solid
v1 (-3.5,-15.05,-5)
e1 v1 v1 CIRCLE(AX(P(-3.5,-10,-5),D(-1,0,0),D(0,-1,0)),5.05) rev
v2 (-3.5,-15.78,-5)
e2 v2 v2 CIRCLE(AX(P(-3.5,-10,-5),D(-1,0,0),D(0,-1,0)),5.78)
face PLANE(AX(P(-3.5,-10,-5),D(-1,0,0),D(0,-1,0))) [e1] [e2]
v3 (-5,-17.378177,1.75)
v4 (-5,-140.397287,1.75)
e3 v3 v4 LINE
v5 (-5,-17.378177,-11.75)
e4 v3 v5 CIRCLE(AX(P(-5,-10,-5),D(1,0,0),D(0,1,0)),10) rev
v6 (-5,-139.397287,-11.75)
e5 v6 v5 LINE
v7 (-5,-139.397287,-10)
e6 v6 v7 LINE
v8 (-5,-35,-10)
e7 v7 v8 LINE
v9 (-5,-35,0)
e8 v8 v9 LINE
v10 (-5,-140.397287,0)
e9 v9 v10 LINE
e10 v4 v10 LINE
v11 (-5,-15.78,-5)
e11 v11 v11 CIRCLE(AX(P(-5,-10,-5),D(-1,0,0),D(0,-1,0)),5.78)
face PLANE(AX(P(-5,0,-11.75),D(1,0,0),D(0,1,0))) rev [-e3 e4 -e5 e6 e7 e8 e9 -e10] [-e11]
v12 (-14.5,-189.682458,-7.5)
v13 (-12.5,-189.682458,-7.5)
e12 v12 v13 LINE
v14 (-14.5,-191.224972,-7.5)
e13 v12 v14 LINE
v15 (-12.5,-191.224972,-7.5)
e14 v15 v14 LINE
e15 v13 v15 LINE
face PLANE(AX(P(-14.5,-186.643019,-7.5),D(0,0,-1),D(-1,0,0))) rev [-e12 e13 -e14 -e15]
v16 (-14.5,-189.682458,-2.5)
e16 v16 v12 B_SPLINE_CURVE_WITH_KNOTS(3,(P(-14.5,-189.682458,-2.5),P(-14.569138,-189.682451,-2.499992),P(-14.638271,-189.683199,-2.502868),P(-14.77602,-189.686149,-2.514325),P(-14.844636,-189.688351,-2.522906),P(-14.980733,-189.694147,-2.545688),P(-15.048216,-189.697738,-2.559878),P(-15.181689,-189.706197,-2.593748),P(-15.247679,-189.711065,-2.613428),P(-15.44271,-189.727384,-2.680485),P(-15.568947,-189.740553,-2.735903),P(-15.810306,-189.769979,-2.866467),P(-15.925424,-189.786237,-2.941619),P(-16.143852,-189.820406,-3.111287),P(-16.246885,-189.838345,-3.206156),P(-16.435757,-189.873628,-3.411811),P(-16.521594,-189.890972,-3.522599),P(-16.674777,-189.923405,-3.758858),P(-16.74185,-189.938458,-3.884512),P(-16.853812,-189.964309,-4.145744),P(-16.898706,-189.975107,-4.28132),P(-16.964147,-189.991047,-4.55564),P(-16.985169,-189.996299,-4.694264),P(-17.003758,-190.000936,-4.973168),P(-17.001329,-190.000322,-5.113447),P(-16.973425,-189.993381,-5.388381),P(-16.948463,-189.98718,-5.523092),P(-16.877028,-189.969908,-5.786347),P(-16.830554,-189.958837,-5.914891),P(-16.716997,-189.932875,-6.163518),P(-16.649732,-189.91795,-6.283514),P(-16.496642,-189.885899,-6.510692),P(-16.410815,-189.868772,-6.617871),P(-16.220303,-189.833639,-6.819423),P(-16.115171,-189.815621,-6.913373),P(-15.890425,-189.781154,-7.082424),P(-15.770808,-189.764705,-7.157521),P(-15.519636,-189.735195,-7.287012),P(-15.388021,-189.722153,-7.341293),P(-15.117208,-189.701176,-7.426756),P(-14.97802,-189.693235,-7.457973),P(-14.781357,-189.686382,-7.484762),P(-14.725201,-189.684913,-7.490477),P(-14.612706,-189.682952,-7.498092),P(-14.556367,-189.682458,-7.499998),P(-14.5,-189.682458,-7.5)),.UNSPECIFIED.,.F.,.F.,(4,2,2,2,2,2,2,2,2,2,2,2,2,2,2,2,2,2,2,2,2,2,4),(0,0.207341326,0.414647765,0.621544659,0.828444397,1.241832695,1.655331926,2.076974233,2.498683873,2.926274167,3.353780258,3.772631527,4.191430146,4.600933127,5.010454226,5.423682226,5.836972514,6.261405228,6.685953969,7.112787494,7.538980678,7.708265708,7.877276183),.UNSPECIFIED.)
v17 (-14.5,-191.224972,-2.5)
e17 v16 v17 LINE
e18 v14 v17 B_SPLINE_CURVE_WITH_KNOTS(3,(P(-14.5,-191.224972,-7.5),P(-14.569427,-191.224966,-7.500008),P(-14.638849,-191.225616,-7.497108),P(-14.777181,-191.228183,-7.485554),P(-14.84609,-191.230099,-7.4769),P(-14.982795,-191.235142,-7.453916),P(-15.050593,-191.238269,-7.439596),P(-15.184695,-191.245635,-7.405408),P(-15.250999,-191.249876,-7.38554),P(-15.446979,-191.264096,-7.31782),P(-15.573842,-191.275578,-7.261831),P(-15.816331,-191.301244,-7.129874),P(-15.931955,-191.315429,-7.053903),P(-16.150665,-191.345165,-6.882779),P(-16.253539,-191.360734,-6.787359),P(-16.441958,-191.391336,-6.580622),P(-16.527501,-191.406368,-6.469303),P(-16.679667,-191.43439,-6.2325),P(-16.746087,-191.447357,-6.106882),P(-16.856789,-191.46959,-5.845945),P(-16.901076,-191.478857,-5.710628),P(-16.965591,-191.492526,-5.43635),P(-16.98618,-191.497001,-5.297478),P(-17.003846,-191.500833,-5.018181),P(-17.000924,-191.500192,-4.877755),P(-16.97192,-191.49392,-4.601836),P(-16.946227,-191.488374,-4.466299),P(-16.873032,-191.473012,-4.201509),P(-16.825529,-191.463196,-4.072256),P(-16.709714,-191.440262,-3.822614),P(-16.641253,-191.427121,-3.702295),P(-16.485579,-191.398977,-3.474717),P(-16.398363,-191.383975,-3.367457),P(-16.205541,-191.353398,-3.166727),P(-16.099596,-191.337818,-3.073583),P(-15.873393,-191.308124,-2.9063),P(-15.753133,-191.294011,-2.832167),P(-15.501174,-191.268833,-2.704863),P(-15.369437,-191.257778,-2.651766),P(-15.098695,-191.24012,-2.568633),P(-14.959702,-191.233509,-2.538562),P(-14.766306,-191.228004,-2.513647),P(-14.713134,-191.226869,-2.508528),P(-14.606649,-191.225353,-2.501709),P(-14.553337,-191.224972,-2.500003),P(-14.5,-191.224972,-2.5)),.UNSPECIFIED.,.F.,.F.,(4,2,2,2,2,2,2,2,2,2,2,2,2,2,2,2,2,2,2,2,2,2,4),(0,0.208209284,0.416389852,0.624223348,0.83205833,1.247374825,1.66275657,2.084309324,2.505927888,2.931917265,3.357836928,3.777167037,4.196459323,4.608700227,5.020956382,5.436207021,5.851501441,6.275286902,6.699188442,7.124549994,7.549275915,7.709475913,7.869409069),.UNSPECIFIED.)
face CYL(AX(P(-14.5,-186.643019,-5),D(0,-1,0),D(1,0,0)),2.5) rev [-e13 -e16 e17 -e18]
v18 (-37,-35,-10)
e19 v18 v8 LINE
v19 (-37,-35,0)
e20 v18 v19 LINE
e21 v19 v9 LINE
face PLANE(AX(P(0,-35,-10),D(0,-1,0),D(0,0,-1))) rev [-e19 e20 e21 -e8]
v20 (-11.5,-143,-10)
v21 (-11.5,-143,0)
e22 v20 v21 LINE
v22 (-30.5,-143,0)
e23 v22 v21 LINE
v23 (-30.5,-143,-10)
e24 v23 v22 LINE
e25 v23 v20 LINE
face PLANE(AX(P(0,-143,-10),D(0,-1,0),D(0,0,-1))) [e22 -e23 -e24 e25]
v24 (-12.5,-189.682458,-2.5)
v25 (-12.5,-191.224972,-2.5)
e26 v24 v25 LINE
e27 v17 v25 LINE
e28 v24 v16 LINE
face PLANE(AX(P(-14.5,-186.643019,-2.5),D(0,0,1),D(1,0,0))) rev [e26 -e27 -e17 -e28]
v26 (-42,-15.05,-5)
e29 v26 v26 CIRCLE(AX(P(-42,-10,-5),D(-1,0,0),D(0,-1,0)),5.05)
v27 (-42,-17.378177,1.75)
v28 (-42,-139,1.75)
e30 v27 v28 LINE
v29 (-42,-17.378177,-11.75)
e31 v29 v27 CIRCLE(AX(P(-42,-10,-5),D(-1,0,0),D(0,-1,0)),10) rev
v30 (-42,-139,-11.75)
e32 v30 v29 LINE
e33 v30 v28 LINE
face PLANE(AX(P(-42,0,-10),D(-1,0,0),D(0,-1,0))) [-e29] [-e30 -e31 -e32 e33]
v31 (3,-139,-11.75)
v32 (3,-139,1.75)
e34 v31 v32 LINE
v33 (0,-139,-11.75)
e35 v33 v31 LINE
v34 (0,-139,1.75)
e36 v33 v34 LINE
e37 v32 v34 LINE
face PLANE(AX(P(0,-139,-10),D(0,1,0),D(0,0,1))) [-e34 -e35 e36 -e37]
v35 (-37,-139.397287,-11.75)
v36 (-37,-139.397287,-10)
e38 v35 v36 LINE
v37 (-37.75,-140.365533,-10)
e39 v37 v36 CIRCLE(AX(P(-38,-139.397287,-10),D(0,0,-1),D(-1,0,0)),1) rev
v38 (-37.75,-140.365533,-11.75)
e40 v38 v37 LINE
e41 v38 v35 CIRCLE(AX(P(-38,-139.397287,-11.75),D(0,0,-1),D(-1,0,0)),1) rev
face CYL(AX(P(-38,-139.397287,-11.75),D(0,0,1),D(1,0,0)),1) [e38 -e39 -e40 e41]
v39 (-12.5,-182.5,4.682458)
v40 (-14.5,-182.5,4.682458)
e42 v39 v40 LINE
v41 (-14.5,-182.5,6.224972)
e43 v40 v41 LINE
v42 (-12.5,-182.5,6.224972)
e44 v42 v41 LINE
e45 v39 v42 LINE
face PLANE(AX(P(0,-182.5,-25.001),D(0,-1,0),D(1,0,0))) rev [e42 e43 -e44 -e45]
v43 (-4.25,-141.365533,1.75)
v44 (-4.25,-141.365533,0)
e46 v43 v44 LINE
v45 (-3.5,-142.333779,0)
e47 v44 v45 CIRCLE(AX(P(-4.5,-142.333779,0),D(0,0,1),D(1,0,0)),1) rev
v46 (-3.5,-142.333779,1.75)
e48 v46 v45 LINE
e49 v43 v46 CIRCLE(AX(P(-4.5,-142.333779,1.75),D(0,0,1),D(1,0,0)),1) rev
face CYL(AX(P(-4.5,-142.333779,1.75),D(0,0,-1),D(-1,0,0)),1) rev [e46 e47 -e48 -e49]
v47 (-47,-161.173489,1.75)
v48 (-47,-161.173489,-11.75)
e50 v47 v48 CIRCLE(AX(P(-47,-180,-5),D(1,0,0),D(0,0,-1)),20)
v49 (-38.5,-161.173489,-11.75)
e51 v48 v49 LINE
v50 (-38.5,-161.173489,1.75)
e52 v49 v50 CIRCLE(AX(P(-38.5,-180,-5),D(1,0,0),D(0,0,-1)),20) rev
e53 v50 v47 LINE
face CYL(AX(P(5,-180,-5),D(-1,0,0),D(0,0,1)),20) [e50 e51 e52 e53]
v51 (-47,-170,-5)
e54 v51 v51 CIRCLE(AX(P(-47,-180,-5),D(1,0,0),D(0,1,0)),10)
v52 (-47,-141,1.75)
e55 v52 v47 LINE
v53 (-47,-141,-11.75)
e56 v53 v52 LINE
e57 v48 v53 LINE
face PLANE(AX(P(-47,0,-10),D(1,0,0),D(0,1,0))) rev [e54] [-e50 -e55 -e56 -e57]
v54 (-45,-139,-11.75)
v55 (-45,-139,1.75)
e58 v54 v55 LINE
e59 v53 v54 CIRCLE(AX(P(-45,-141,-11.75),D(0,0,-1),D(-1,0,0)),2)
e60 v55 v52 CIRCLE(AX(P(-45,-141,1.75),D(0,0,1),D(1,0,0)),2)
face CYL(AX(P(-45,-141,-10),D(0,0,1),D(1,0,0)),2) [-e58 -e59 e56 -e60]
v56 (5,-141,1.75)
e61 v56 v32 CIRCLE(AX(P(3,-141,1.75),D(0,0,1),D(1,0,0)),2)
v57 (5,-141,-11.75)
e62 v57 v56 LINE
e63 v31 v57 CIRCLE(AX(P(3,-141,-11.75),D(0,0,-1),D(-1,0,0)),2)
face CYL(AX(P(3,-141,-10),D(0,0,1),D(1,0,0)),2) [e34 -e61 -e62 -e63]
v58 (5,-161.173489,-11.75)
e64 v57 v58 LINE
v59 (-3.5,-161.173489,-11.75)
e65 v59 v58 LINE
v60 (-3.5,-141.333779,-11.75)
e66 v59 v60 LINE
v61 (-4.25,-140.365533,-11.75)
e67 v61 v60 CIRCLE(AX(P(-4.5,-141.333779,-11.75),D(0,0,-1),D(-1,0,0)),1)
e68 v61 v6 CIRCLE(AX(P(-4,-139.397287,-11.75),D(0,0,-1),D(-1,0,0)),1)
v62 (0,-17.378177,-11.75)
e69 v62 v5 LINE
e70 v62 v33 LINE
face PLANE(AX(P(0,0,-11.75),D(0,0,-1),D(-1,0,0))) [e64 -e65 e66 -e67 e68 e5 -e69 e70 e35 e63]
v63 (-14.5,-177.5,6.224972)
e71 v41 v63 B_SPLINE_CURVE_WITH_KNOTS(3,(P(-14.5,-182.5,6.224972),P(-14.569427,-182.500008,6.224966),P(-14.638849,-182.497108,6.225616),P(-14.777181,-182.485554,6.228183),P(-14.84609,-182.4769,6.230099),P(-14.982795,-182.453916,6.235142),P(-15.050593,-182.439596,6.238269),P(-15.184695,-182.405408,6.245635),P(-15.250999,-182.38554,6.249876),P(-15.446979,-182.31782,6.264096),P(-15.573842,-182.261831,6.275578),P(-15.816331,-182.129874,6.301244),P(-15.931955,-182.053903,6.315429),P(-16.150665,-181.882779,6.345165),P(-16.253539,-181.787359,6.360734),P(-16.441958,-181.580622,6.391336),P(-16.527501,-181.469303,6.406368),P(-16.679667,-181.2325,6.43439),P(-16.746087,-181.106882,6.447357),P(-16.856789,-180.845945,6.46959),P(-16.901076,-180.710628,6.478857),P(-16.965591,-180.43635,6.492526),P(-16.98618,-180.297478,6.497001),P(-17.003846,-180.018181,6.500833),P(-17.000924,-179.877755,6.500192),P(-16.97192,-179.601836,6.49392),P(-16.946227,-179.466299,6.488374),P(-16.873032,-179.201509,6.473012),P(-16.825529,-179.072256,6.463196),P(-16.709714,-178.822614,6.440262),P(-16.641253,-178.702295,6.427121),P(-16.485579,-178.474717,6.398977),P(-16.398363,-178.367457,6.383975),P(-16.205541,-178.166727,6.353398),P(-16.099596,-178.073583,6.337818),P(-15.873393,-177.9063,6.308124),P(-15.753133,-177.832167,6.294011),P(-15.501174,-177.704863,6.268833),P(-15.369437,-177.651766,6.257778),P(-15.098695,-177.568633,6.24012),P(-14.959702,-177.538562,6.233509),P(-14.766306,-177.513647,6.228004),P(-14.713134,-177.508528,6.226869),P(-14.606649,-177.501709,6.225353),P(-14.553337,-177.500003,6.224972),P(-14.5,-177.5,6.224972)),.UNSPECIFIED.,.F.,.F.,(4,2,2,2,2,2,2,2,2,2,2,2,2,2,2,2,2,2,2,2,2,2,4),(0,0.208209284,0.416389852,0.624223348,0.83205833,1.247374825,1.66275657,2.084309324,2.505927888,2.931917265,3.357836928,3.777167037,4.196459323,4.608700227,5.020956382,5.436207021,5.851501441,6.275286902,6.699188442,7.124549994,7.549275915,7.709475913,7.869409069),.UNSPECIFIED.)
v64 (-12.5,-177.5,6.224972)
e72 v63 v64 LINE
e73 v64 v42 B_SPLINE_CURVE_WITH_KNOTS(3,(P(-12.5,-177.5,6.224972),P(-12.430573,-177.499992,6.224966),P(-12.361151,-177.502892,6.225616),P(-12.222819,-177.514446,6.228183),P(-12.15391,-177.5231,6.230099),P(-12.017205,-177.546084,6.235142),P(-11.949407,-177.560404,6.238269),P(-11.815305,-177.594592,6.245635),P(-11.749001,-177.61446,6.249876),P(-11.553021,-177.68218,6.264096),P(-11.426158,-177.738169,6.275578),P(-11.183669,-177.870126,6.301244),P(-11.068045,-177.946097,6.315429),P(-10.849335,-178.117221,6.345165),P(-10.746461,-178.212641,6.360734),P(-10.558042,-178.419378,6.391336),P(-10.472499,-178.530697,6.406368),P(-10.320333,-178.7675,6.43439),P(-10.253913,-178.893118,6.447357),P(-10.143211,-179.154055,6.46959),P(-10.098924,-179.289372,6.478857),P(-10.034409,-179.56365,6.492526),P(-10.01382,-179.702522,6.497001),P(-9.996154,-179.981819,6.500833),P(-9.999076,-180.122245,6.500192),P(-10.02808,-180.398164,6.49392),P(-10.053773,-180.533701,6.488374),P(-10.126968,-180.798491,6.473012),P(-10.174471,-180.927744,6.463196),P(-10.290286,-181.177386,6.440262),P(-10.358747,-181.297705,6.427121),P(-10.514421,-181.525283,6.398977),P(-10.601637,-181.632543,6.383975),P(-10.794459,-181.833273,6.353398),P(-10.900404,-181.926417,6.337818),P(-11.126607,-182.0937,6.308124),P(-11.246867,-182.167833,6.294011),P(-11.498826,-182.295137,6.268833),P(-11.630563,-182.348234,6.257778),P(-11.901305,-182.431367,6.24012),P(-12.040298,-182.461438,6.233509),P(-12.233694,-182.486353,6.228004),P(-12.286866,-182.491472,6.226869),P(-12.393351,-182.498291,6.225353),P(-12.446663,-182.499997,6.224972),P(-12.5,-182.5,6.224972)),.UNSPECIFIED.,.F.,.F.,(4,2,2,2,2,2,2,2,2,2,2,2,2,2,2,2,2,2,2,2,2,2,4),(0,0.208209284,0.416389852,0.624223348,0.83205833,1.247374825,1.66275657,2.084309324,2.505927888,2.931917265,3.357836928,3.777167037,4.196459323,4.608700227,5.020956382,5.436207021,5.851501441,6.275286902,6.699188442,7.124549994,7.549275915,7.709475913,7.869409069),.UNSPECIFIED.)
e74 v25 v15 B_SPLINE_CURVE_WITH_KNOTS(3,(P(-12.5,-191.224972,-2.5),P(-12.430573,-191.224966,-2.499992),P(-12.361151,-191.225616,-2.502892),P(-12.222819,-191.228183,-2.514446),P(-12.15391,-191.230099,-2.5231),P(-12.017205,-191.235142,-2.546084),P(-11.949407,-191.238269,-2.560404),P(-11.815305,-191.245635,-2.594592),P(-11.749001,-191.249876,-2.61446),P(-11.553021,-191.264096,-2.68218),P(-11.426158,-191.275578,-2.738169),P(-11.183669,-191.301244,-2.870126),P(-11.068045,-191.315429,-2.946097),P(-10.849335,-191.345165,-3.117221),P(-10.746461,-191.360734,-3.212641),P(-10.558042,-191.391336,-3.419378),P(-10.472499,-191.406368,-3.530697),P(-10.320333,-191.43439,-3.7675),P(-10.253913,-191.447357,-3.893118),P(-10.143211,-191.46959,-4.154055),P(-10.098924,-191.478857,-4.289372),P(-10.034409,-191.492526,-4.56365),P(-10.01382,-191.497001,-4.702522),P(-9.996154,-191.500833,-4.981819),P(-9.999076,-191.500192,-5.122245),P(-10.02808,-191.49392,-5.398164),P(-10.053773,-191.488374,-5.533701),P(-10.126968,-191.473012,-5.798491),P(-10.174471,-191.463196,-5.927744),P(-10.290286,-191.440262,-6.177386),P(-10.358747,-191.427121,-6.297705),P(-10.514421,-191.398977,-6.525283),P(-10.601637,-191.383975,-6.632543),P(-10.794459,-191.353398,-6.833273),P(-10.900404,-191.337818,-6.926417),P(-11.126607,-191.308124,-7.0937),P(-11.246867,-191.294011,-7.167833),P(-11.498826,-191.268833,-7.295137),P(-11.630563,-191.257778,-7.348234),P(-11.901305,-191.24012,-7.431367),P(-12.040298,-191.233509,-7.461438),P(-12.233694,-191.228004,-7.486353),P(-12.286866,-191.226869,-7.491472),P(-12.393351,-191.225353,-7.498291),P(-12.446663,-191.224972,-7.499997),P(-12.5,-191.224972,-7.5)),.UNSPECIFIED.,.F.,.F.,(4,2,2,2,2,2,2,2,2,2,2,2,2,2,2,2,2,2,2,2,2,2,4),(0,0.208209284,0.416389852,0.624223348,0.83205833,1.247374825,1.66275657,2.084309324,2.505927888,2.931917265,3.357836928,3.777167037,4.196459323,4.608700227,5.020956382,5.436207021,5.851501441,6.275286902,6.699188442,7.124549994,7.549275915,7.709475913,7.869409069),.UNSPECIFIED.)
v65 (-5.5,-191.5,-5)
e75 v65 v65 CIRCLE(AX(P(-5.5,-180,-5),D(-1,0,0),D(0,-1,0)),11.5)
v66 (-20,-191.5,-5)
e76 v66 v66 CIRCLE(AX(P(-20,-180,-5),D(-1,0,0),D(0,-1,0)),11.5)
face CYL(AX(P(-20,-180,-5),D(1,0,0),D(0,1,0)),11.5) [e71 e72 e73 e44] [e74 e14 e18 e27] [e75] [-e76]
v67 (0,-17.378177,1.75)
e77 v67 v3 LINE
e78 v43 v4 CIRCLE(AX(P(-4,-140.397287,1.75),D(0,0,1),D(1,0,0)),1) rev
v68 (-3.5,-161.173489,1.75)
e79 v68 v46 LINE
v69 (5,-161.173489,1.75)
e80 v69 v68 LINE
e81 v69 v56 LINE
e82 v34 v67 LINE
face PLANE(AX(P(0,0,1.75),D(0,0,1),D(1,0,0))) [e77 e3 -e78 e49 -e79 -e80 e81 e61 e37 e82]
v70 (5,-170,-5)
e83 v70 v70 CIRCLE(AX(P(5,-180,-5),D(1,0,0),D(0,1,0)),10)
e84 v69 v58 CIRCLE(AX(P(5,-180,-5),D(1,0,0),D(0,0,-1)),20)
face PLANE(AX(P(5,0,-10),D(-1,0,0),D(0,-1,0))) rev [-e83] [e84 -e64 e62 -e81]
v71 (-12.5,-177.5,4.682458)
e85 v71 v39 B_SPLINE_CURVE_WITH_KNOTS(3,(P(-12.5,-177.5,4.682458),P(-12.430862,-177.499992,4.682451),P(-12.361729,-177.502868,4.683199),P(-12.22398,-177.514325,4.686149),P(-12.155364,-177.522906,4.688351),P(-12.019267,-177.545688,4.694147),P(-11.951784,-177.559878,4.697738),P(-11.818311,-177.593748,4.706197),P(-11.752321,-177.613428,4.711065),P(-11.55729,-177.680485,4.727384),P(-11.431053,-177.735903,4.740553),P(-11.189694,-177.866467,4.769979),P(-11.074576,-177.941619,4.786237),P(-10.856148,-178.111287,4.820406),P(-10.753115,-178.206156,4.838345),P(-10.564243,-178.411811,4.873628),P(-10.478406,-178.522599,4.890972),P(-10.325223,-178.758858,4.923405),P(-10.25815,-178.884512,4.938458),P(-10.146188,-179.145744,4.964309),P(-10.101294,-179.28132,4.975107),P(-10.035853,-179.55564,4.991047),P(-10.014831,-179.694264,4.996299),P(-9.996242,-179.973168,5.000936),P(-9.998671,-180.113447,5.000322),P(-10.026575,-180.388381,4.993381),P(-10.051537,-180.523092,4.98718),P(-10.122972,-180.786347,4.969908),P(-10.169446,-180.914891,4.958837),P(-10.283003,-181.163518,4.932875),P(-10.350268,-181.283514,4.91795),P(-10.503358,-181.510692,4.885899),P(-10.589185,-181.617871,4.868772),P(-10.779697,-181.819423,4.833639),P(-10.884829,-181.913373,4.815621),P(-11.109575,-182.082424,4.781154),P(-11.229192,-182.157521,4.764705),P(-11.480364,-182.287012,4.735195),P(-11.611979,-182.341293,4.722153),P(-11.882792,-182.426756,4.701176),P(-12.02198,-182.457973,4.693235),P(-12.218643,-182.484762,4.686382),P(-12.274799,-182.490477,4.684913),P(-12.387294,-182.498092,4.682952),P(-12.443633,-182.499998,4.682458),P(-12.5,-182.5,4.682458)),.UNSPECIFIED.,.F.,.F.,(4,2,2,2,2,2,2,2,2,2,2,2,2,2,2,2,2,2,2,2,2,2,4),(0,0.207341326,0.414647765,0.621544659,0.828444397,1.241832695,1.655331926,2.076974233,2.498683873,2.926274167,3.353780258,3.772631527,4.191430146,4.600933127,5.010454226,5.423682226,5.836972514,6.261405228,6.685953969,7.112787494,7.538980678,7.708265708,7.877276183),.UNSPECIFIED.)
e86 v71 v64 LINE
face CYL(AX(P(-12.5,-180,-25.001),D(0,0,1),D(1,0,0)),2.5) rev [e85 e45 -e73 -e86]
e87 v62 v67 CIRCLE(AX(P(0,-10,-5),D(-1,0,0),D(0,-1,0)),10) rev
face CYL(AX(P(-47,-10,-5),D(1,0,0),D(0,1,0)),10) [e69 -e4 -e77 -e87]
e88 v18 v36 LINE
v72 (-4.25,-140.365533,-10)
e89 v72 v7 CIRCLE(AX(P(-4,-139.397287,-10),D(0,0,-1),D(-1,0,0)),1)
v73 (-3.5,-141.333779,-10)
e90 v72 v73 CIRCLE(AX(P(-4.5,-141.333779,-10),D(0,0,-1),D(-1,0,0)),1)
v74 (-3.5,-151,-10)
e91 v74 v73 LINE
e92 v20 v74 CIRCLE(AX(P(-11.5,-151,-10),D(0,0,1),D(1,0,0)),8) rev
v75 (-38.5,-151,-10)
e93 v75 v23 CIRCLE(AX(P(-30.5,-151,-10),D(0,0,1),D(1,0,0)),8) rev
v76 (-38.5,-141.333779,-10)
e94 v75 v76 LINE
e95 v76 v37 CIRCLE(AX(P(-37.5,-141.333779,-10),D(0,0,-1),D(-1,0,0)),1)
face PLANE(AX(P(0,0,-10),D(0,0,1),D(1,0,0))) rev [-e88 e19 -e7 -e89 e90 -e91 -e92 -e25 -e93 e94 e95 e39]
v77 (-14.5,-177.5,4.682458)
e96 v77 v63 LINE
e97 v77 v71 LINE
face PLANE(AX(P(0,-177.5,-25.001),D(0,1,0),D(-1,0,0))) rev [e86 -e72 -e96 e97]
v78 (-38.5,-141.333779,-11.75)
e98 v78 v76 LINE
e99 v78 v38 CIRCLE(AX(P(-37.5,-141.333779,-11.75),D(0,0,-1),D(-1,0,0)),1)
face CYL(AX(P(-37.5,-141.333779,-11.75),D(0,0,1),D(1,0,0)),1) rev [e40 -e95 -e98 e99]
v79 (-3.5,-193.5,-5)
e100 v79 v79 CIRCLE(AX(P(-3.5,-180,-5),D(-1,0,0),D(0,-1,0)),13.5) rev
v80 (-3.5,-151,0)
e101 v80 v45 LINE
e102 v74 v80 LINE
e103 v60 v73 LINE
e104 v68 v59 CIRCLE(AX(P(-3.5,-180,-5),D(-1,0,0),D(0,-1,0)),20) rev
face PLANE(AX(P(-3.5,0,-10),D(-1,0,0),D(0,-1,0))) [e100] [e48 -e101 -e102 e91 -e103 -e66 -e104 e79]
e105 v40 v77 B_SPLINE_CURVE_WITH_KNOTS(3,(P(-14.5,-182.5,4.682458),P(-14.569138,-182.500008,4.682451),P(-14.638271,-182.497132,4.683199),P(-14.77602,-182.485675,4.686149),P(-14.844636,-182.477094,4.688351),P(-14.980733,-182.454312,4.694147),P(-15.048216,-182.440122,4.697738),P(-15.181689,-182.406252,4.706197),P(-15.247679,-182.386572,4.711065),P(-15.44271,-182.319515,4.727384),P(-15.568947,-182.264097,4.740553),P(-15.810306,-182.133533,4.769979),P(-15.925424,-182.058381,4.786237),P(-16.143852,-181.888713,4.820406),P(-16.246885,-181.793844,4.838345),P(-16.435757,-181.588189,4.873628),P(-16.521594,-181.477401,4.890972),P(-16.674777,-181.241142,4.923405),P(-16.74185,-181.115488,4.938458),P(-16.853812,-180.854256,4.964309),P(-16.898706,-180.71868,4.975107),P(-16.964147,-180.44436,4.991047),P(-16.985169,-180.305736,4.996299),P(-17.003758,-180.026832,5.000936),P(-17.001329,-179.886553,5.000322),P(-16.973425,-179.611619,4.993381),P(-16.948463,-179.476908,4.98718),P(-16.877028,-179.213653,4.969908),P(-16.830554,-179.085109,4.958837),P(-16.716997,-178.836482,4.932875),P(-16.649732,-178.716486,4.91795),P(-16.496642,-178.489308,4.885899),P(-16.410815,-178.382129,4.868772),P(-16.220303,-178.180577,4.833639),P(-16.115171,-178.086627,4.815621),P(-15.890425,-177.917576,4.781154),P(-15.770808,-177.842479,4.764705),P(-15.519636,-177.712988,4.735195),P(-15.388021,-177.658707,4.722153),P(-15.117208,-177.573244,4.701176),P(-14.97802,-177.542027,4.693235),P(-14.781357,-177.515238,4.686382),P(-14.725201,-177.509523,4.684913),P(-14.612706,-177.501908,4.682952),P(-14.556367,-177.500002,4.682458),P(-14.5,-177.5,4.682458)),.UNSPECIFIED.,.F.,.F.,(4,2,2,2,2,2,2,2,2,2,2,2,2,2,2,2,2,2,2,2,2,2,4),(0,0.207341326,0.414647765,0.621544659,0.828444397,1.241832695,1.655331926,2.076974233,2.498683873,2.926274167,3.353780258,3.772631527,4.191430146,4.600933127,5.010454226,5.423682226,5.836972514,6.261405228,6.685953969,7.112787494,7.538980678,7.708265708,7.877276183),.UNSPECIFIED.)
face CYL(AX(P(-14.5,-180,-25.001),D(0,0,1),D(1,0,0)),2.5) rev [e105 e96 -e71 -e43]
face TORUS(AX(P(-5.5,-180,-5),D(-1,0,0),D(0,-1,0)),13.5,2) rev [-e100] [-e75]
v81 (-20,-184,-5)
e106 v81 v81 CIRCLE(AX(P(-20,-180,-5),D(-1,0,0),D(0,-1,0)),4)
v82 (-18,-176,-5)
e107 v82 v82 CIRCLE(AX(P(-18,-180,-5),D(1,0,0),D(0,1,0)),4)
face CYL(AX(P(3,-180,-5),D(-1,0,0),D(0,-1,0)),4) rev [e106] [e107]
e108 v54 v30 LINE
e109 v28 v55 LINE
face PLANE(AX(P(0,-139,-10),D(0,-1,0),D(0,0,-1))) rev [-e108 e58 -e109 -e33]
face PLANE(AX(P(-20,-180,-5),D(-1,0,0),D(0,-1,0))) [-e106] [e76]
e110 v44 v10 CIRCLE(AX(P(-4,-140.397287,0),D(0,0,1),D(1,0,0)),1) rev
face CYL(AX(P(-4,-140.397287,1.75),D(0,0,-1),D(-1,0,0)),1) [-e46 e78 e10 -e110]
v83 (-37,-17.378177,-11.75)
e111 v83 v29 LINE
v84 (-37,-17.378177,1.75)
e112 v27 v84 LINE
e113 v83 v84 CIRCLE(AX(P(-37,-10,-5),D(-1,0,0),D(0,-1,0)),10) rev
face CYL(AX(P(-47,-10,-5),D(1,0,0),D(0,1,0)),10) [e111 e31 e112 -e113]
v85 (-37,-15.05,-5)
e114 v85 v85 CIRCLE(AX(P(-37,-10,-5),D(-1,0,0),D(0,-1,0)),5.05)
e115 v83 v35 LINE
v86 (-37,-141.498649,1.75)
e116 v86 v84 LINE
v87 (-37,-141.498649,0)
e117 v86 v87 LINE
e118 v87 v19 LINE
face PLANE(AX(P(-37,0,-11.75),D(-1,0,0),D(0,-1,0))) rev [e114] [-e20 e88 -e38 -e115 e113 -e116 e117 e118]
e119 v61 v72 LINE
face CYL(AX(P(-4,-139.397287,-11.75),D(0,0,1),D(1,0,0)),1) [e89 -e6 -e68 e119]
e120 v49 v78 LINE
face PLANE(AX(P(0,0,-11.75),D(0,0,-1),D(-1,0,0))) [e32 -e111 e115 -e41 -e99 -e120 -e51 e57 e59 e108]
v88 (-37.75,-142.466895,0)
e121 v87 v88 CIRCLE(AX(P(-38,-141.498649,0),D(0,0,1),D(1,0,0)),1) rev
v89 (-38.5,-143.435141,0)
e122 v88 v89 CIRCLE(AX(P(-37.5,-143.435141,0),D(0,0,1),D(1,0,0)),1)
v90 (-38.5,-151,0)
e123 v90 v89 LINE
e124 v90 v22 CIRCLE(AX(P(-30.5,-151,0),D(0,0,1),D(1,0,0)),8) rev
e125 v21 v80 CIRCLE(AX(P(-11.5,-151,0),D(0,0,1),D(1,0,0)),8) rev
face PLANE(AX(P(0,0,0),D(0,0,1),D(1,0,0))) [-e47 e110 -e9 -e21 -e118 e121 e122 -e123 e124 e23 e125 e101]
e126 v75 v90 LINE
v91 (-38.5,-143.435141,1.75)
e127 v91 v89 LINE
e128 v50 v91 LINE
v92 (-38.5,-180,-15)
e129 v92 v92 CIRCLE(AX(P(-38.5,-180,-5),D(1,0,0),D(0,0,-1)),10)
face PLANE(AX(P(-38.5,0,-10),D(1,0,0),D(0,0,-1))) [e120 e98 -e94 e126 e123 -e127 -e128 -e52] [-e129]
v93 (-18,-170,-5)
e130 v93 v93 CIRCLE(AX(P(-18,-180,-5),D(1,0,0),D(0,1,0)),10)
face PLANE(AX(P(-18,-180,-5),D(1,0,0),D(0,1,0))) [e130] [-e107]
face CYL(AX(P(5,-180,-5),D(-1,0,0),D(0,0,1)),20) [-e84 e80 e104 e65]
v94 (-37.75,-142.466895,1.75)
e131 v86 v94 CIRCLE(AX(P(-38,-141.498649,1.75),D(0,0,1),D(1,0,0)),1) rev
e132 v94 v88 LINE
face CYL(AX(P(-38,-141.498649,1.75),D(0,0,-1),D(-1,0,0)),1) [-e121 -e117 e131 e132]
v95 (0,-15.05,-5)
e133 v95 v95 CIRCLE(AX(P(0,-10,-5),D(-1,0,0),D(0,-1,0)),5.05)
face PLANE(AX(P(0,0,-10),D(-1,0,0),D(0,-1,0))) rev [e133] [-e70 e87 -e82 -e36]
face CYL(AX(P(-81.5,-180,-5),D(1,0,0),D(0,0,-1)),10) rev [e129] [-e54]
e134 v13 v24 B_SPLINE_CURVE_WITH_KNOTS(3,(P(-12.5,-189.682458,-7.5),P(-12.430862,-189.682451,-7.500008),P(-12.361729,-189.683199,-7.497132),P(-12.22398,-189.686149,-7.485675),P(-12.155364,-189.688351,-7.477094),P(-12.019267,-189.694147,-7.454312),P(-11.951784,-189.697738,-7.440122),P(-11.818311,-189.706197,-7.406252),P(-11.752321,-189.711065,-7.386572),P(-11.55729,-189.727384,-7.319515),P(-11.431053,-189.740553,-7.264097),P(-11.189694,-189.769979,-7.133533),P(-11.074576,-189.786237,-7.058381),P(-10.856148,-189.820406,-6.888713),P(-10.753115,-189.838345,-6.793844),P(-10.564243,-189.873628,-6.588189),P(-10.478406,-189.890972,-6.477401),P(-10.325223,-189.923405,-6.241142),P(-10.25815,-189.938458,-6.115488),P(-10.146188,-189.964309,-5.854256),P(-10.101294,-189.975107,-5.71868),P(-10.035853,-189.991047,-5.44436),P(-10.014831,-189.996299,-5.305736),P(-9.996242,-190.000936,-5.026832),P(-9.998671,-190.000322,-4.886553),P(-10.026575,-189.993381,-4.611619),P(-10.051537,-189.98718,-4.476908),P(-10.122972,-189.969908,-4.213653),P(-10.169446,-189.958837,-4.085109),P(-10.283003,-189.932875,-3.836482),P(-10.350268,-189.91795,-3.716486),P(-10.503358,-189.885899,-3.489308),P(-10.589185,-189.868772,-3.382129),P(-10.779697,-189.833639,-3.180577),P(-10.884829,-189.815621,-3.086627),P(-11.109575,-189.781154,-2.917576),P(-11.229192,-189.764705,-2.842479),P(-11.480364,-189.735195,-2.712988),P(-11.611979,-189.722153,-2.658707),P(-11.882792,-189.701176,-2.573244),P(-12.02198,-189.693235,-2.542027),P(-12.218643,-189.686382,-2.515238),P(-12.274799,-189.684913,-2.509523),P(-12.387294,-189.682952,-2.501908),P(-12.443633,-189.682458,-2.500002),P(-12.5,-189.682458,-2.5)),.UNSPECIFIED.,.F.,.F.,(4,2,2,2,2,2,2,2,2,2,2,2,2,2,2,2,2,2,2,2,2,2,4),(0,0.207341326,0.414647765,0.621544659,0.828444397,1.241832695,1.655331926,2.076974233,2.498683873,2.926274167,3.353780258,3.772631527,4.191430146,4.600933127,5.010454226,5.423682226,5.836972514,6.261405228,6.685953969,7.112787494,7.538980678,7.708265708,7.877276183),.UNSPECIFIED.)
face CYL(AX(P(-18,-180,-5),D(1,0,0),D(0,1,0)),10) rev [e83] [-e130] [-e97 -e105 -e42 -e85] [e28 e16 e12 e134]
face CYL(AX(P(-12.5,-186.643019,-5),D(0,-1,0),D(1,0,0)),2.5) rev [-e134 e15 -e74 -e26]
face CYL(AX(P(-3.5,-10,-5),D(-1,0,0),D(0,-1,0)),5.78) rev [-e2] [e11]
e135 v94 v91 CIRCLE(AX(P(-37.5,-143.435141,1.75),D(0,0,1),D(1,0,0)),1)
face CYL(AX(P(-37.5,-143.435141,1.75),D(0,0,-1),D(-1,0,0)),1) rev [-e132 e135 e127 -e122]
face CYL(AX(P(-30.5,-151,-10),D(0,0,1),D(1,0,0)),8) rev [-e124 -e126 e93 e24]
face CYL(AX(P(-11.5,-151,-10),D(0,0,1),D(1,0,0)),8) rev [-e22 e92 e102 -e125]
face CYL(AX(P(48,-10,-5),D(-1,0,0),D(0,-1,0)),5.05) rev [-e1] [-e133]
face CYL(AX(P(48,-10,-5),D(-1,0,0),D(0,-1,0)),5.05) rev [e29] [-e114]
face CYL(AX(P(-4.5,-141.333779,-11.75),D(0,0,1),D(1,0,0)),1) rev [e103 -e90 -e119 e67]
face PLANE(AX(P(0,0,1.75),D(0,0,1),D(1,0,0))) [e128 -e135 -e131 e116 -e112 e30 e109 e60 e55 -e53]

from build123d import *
from build123d.topology import SkipClean

# Parameters (mm, degrees)
SALIENTE_EXTRUIR1_DEPTH    = 10
SALIENTE_EXTRUIR2_DEPTH    = 10
SALIENTE_EXTRUIR3_DEPTH    = 10
SALIENTE_EXTRUIR4_DEPTH    = 1.75
SALIENTE_EXTRUIR5_START    = 1.75
SALIENTE_EXTRUIR5_DEPTH    = 1.75
CROQUIS26_W                = 5
CROQUIS26_H                = 35
SALIENTE_EXTRUIR6_DEPTH    = 1.75
CROQUIS27_W                = 5
CROQUIS27_H                = 35
SALIENTE_EXTRUIR7_DEPTH    = 11.75
CORTAR_EXTRUIR3_DEPTH      = 205.699932829
CORTAR_EXTRUIR3_DEPTH_BACK = 99.75
SALIENTE_EXTRUIR8_START    = -5
SALIENTE_EXTRUIR8_DEPTH    = 5
CROQUIS29_R                = 10
SALIENTE_EXTRUIR9_DEPTH    = 5
CORTAR_EXTRUIR5_DEPTH      = 206.22487666
CORTAR_EXTRUIR5_DEPTH_BACK = 206.22487666
SALIENTE_EXTRUIR11_START   = -8.5
CROQUIS32_R                = 20
SALIENTE_EXTRUIR11_DEPTH   = 8.5
CROQUIS33_R                = 20
SALIENTE_EXTRUIR12_DEPTH   = 8.5
CROQUIS34_R                = 5.05
CORTAR_EXTRUIR6_DEPTH      = 90
CROQUIS39_R                = 5.78
CORTAR_EXTRUIR7_DEPTH      = 1.5
CROQUIS41_R                = 10
CORTAR_EXTRUIR8_DEPTH      = 43
CROQUIS42_R                = 4
CORTAR_EXTRUIR9_DEPTH      = 27
CROQUIS43_R                = 10
CORTAR_EXTRUIR10_DEPTH     = 12
CROQUIS45_R                = 11.5
SALIENTE_EXTRUIR13_DEPTH   = 16.5
REDONDEO1_R                = 2
CROQUIS48_R                = 10
CORTAR_EXTRUIR12_DEPTH     = 17
SALIENTE_EXTRUIR16_DEPTH   = 6
CORTAR_EXTRUIR23_START     = -13
CORTAR_EXTRUIR23_DEPTH     = 13
SALIENTE_EXTRUIR17_START   = -25
CROQUIS54_R                = 11.5
SALIENTE_EXTRUIR17_DEPTH   = 25
CROQUIS57_R                = 10
CORTAR_EXTRUIR26_DEPTH     = 23
CROQUIS58_R                = 4
CORTAR_EXTRUIR27_DEPTH     = 23
SALIENTE_EXTRUIR18_DEPTH   = 7.5
SALIENTE_EXTRUIR18_2_DEPTH = 7.5
CORTAR_EXTRUIR28_DEPTH     = 7.5
CORTAR_EXTRUIR30_START     = -2.643019
CORTAR_EXTRUIR30_DEPTH     = 2.643019
CORTAR_EXTRUIR33_START     = -6.139862392
CORTAR_EXTRUIR33_DEPTH     = 6.139862392
CORTAR_EXTRUIR34_START     = -35.822321
CORTAR_EXTRUIR34_DEPTH     = 40


# Read off the part's stored shape, not the designer's step: Cortar-Extruir33
with BuildPart() as part:
    # Croquis1 → Saliente-Extruir1 (new body)
    with BuildSketch(Plane.XY):
        Polygon((0, -143), (0, -35), (-1.6, -35), (-37.4, -35), (-42, -35), (-42, -143), align=None)
    extrude(amount=-SALIENTE_EXTRUIR1_DEPTH)

    # Croquis3 → Saliente-Extruir2 (add)
    with BuildSketch(Plane.XY):
        with BuildLine():
            Line((-47, -141), (-47, -145))
            Line((-47, -145), (-47, -160))
            Line((-47, -160), (-47, -180))
            Line((-47, -180), (-47, -200))
            Line((-47, -200), (-38.5, -200))
            Line((-38.5, -200), (-38.5, -151))
            Line((-38.5, -151), (-38.5, -143))
            Line((-38.5, -143), (-42, -143))
            Line((-42, -143), (-42, -139))
            Line((-42, -139), (-45, -139))
            ThreePointArc((-45, -139), (-46.414213562, -139.585786438), (-47, -141))
        make_face()
        with BuildLine():
            Line((0, -143), (-11.5, -143))
            ThreePointArc((-11.5, -143), (-5.843145751, -145.343145751), (-3.5, -151))
            Line((-3.5, -151), (-3.5, -200))
            Line((-3.5, -200), (5, -200))
            Line((5, -200), (5, -143))
            Line((5, -143), (5, -141))
            ThreePointArc((5, -141), (4.414213562, -139.585786438), (3, -139))
            Line((3, -139), (0, -139))
            Line((0, -139), (0, -143))
        make_face()
    extrude(amount=-SALIENTE_EXTRUIR2_DEPTH)

    # Croquis21 → Saliente-Extruir3 (add)
    with BuildSketch(Plane.XY):
        with BuildLine():
            Line((-38.5, -143), (-38.5, -151))
            ThreePointArc((-38.5, -151), (-36.156854249, -145.343145751), (-30.5, -143))
            Line((-30.5, -143), (-38.5, -143))
        make_face()
    extrude(amount=-SALIENTE_EXTRUIR3_DEPTH)

    # Croquis22 → Saliente-Extruir4 (add)
    with BuildSketch(Plane(origin=(0, 0, -10), x_dir=(-1, 0, 0), z_dir=(0, 0, -1))):
        with BuildLine():
            Line((3.5, -200), (3.5, -156.87358131))
            Line((3.5, -156.87358131), (3.5, -151))
            Line((3.5, -151), (3.5, -141.333778868))
            ThreePointArc((3.5, -141.333778868), (3.709430585, -140.721406432), (4.25, -140.365533031))
            ThreePointArc((4.25, -140.365533031), (4.790569415, -140.00965963), (5, -139.397287194))
            Line((5, -139.397287194), (5, -35))
            Line((5, -35), (0, -35))
            Line((0, -35), (0, -139))
            Line((0, -139), (-3, -139))
            ThreePointArc((-3, -139), (-4.414213562, -139.585786438), (-5, -141))
            Line((-5, -141), (-5, -200))
            Line((-5, -200), (3.5, -200))
        make_face()
        with BuildLine():
            Line((42, -35), (37, -35))
            Line((37, -35), (37, -139.397287194))
            ThreePointArc((37, -139.397287194), (37.209430585, -140.00965963), (37.75, -140.365533031))
            ThreePointArc((37.75, -140.365533031), (38.290569415, -140.721406432), (38.5, -141.333778868))
            Line((38.5, -141.333778868), (38.5, -151))
            Line((38.5, -151), (38.5, -155.512462497))
            Line((38.5, -155.512462497), (38.5, -200))
            Line((38.5, -200), (47, -200))
            Line((47, -200), (47, -141))
            ThreePointArc((47, -141), (46.414213562, -139.585786438), (45, -139))
            Line((45, -139), (42, -139))
            Line((42, -139), (42, -35))
        make_face()
    extrude(amount=SALIENTE_EXTRUIR4_DEPTH)

    # Croquis24 → Saliente-Extruir5 (add)
    with BuildSketch(Plane.XY.offset(SALIENTE_EXTRUIR5_START)):
        with BuildLine():
            Line((-37, -141.498649254), (-37, -35))
            Line((-37, -35), (-42, -35))
            Line((-42, -35), (-42, -139))
            Line((-42, -139), (-45, -139))
            ThreePointArc((-45, -139), (-46.414213562, -139.585786438), (-47, -141))
            Line((-47, -141), (-47, -200))
            Line((-47, -200), (-38.5, -200))
            Line((-38.5, -200), (-38.5, -143.435140927))
            ThreePointArc((-38.5, -143.435140927), (-38.290569415, -142.822768491), (-37.75, -142.466895091))
            ThreePointArc((-37.75, -142.466895091), (-37.209430585, -142.11102169), (-37, -141.498649254))
        make_face()
        with BuildLine():
            Line((0, -35), (-5, -35))
            Line((-5, -35), (-5, -140.397287194))
            ThreePointArc((-5, -140.397287194), (-4.790569415, -141.00965963), (-4.25, -141.365533031))
            ThreePointArc((-4.25, -141.365533031), (-3.709430585, -141.721406432), (-3.5, -142.333778868))
            Line((-3.5, -142.333778868), (-3.5, -200))
            Line((-3.5, -200), (5, -200))
            Line((5, -200), (5, -141))
            ThreePointArc((5, -141), (4.414213562, -139.585786438), (3, -139))
            Line((3, -139), (0, -139))
            Line((0, -139), (0, -35))
        make_face()
    extrude(amount=-SALIENTE_EXTRUIR5_DEPTH)

    # Croquis26 → Saliente-Extruir6 (add)
    with BuildSketch(Plane.XY):
        with Locations((-39.5, -17.5)):
            Rectangle(CROQUIS26_W, CROQUIS26_H)
        with Locations((-2.5, -17.5)):
            Rectangle(CROQUIS26_W, CROQUIS26_H)
    extrude(amount=SALIENTE_EXTRUIR6_DEPTH)

    # Croquis27 → Saliente-Extruir7 (add)
    with BuildSketch(Plane(origin=(0, 0, 0), x_dir=(-1, 0, 0), z_dir=(0, 0, -1))):
        with Locations((2.5, -17.5)):
            Rectangle(CROQUIS27_W, CROQUIS27_H)
        with Locations((39.5, -17.5)):
            Rectangle(CROQUIS27_W, CROQUIS27_H)
    extrude(amount=SALIENTE_EXTRUIR7_DEPTH)

    # Croquis28 → Cortar-Extruir3 (cut, two sides: drawn at the far end of the back side and taken through both)
    with BuildSketch(Plane.ZY.offset(5).offset(-CORTAR_EXTRUIR3_DEPTH_BACK)):
        with BuildLine():
            ThreePointArc((-11.75, -2.621822718), (-8.62065099, -0.678471884), (-5, 0))
            Line((-5, 0), (-11.75, 0))
            Line((-11.75, 0), (-11.75, -2.621822718))
        make_face()
        with BuildLine():
            Line((1.75, -2.621822718), (1.75, 0))
            Line((1.75, 0), (-5, 0))
            ThreePointArc((-5, 0), (-1.37934901, -0.678471884), (1.75, -2.621822718))
        make_face()
    extrude(amount=CORTAR_EXTRUIR3_DEPTH + CORTAR_EXTRUIR3_DEPTH_BACK, mode=Mode.SUBTRACT)

    # Croquis28<5> → Saliente-Extruir8 (add)
    with BuildSketch(Plane.ZY.offset(5).offset(SALIENTE_EXTRUIR8_START)):
        with BuildLine():
            Line((-11.75, -17.378177282), (-11.75, -2.621822718))
            ThreePointArc((-11.75, -2.621822718), (-15, -10), (-11.75, -17.378177282))
        make_face()
        with BuildLine():
            ThreePointArc((5, -10), (4.151502609, -5.968871126), (1.75, -2.621822718))
            Line((1.75, -2.621822718), (1.75, -17.378177282))
            ThreePointArc((1.75, -17.378177282), (4.151502609, -14.031128874), (5, -10))
        make_face()
    extrude(amount=SALIENTE_EXTRUIR8_DEPTH)

    # Croquis29 → Saliente-Extruir9 (add)
    with BuildSketch(Plane(origin=(-37, 0, 0), x_dir=(0, 0, -1), z_dir=(1, 0, 0))):
        with Locations((5, -10)):
            Circle(CROQUIS29_R)
    extrude(amount=-SALIENTE_EXTRUIR9_DEPTH)

    # Croquis31 → Cortar-Extruir5 (cut, two sides: drawn at the far end of the back side and taken through both)
    with BuildSketch(Plane(origin=(-38.5, 0, 0), x_dir=(0, 0, -1), z_dir=(1, 0, 0)).offset(-CORTAR_EXTRUIR5_DEPTH_BACK)):
        with BuildLine():
            Line((-1.75, -200), (5, -200))
            ThreePointArc((5, -200), (1.574376792, -199.704443804), (-1.75, -198.826510564))
            Line((-1.75, -198.826510564), (-1.75, -200))
        make_face()
        with BuildLine():
            Line((11.75, -200), (11.75, -198.826510564))
            ThreePointArc((11.75, -198.826510564), (8.425623208, -199.704443804), (5, -200))
            Line((5, -200), (11.75, -200))
        make_face()
    extrude(amount=CORTAR_EXTRUIR5_DEPTH + CORTAR_EXTRUIR5_DEPTH_BACK, mode=Mode.SUBTRACT)

    # Croquis32 → Saliente-Extruir11 (add)
    with BuildSketch(Plane(origin=(-38.5, 0, 0), x_dir=(0, 0, -1), z_dir=(1, 0, 0)).offset(SALIENTE_EXTRUIR11_START)):
        with Locations((5, -180)):
            Circle(CROQUIS32_R)
    extrude(amount=SALIENTE_EXTRUIR11_DEPTH)

    # Croquis33 → Saliente-Extruir12 (add)
    with BuildSketch(Plane.ZY.offset(3.5)):
        with Locations((-5, -180)):
            Circle(CROQUIS33_R)
    extrude(amount=-SALIENTE_EXTRUIR12_DEPTH)

    # Croquis34 → Cortar-Extruir6 (cut)
    with BuildSketch(Plane.ZY.offset(42)):
        with Locations(Location((-5, -10, 0), (0, 0, 270))):
            Circle(CROQUIS34_R)
    extrude(amount=-CORTAR_EXTRUIR6_DEPTH, mode=Mode.SUBTRACT)

    # Croquis39 → Cortar-Extruir7 (cut)
    with SkipClean():  # the faces are left unmerged after this step: merging them gives an invalid solid
        with BuildSketch(Plane.ZY.offset(5)):
            with Locations(Location((-5, -10, 0), (0, 0, 270))):
                Circle(CROQUIS39_R)
        extrude(amount=-CORTAR_EXTRUIR7_DEPTH, mode=Mode.SUBTRACT)

    # Croquis41 → Cortar-Extruir8 (cut)
    with SkipClean():  # the faces are left unmerged after this step: merging them gives an invalid solid
        with BuildSketch(Plane(origin=(-38.5, 0, 0), x_dir=(0, 0, -1), z_dir=(1, 0, 0))):
            with Locations((5, -180)):
                Circle(CROQUIS41_R)
        extrude(amount=-CORTAR_EXTRUIR8_DEPTH, mode=Mode.SUBTRACT)

    # Croquis42 → Cortar-Extruir9 (cut)
    with SkipClean():  # the faces are left unmerged after this step: merging them gives an invalid solid
        with BuildSketch(Plane(origin=(5, 0, 0), x_dir=(0, 0, -1), z_dir=(1, 0, 0))):
            with Locations(Location((5, -180, 0), (0, 0, 90))):
                Circle(CROQUIS42_R)
        extrude(amount=-CORTAR_EXTRUIR9_DEPTH, mode=Mode.SUBTRACT)

    # Croquis43 → Cortar-Extruir10 (cut)
    with SkipClean():  # the faces are left unmerged after this step: merging them gives an invalid solid
        with BuildSketch(Plane(origin=(5, 0, 0), x_dir=(0, 0, -1), z_dir=(1, 0, 0))):
            with Locations((5, -180)):
                Circle(CROQUIS43_R)
        extrude(amount=-CORTAR_EXTRUIR10_DEPTH, mode=Mode.SUBTRACT)

    # Croquis45 → Saliente-Extruir13 (add)
    with SkipClean():  # the faces are left unmerged after this step: merging them gives an invalid solid
        with BuildSketch(Plane.ZY.offset(3.5)):
            with Locations(Location((-5, -180, 0), (0, 0, 270))):
                Circle(CROQUIS45_R)
        extrude(amount=SALIENTE_EXTRUIR13_DEPTH)

    # Redondeo1
    redondeo1_edges = [part.edges().sort_by_distance(p)[0] for p in [
        (-3.5, -168.5, -5),
    ]]
    fillet(redondeo1_edges, radius=REDONDEO1_R)

    # Croquis48 → Cortar-Extruir12 (cut)
    with SkipClean():  # the faces are left unmerged after this step: merging them gives an invalid solid
        with BuildSketch(Plane(origin=(-3.5, 0, 0), x_dir=(0, 0, -1), z_dir=(1, 0, 0))):
            with Locations((5, -180)):
                Circle(CROQUIS48_R)
        extrude(amount=-CORTAR_EXTRUIR12_DEPTH, mode=Mode.SUBTRACT)

    # Croquis54 → Saliente-Extruir17 (add)
    with SkipClean():  # the faces are left unmerged after this step: merging them gives an invalid solid
        with BuildSketch(Plane.ZY.offset(20).offset(SALIENTE_EXTRUIR17_START)):
            with Locations(Location((-5, -180, 0), (0, 0, 270))):
                Circle(CROQUIS54_R)
        extrude(amount=SALIENTE_EXTRUIR17_DEPTH)

    # Croquis57 → Cortar-Extruir26 (cut)
    with SkipClean():  # the faces are left unmerged after this step: merging them gives an invalid solid
        with BuildSketch(Plane(origin=(5, 0, 0), x_dir=(0, 0, -1), z_dir=(1, 0, 0))):
            with Locations((5, -180)):
                Circle(CROQUIS57_R)
        extrude(amount=-CORTAR_EXTRUIR26_DEPTH, mode=Mode.SUBTRACT)

    # Croquis58 → Cortar-Extruir27 (cut)
    with SkipClean():  # the faces are left unmerged after this step: merging them gives an invalid solid
        with BuildSketch(Plane.ZY.offset(20)):
            with Locations(Location((-5, -180, 0), (0, 0, 270))):
                Circle(CROQUIS58_R)
        extrude(amount=-CORTAR_EXTRUIR27_DEPTH, mode=Mode.SUBTRACT)


with BuildPart() as body_2:
    # Croquis50 → Saliente-Extruir16 (new body)
    with BuildSketch(Plane.ZY.offset(20)):
        with BuildLine():
            ThreePointArc((-16.101801656, -183), (-16.400015768, -181.513155802), (-16.5, -180))
            Line((-16.5, -180), (-16.5, -183))
            Line((-16.5, -183), (-16.101801656, -183))
        make_face()
        with BuildLine():
            Line((-16.5, -176.344003647), (-16.5, -180))
            ThreePointArc((-16.5, -180), (-16.349864922, -178.147821214), (-15.903379782, -176.344003647))
            Line((-15.903379782, -176.344003647), (-16.5, -176.344003647))
        make_face()
        Polygon((-17.164048231, -176.344003647), (-17.164048231, -183), (-16.5, -183), (-16.5, -180), (-16.5, -176.344003647), align=None)
    extrude(amount=-SALIENTE_EXTRUIR16_DEPTH)

    # Croquis52 → Cortar-Extruir23 (cut)
    with BuildSketch(Plane.ZY.offset(20).offset(CORTAR_EXTRUIR23_START)):
        with BuildLine():
            Line((-17.164048231, -183), (-16.101801656, -183))
            ThreePointArc((-16.101801656, -183), (-16.494893405, -179.657325791), (-15.903379782, -176.344003647))
            Line((-15.903379782, -176.344003647), (-17.164048231, -176.344003647))
            Line((-17.164048231, -176.344003647), (-17.164048231, -183))
        make_face()
    extrude(amount=CORTAR_EXTRUIR23_DEPTH, mode=Mode.SUBTRACT)


with BuildPart() as body_2_2:
    # Croquis62 → Saliente-Extruir18 (new body)
    with BuildSketch(Plane.ZY.offset(20)):
        Polygon((10.822320598, -182.5), (10.822320598, -177.5), (6.5, -177.5), (6.5, -180), (6.5, -182.5), align=None)
    extrude(amount=-SALIENTE_EXTRUIR18_DEPTH)


with BuildPart() as body_3:
    # Croquis62 → Saliente-Extruir18 2 (new body)
    with BuildSketch(Plane.ZY.offset(20)):
        Polygon((-7.5, -194.143018627), (-2.5, -194.143018627), (-2.5, -191.5), (-5, -191.5), (-7.5, -191.5), align=None)
    extrude(amount=-SALIENTE_EXTRUIR18_2_DEPTH)


with BuildPart() as cortar_extruir28_tool:
    # Croquis63 → Cortar-Extruir28 (new body)
    with SkipClean():  # the faces are left unmerged after this step: merging them gives an invalid solid
        with BuildSketch(Plane.XZ.offset(194.143018627)):
            with BuildLine():
                Line((-14.5, -2.5), (-12.5, -2.5))
                ThreePointArc((-12.5, -2.5), (-10, -5), (-12.5, -7.5))
                Line((-12.5, -7.5), (-14.5, -7.5))
                ThreePointArc((-14.5, -7.5), (-17, -5), (-14.5, -2.5))
            make_face()
        extrude(amount=-CORTAR_EXTRUIR28_DEPTH)


with BuildPart() as part_1:
    with SkipClean():  # the faces are left unmerged after this step: merging them gives an invalid solid
        add(part.part)

        # Cortar-Extruir28: cut by cortar_extruir28_tool
        add(cortar_extruir28_tool.part, mode=Mode.SUBTRACT)


with BuildPart() as body_3_1:
    with SkipClean():  # the faces are left unmerged after this step: merging them gives an invalid solid
        add(body_3.part)

        # Cortar-Extruir28: cut by cortar_extruir28_tool
        add(cortar_extruir28_tool.part, mode=Mode.SUBTRACT)

    # Croquis64 → Cortar-Extruir30 (cut)
    with BuildSketch(Plane.XZ.offset(194.143018627).offset(CORTAR_EXTRUIR30_START)):
        with BuildLine():
            Line((-14.5, -2.5), (-20, -2.5))
            Line((-20, -2.5), (-20, -7.5))
            Line((-20, -7.5), (-14.5, -7.5))
            ThreePointArc((-14.5, -7.5), (-17, -5), (-14.5, -2.5))
        make_face()
    extrude(amount=CORTAR_EXTRUIR30_DEPTH, mode=Mode.SUBTRACT)


with BuildPart() as cortar_extruir33_tool:
    # Cortar-Extruir33 outline → Cortar-Extruir33 (new body)
    with SkipClean():  # the faces are left unmerged after this step: merging them gives an invalid solid
        with BuildSketch(Plane.XY.offset(10.822320598).offset(CORTAR_EXTRUIR33_START)):
            with BuildLine():
                ThreePointArc((-12.5, -182.5), (-10, -180), (-12.5, -177.5))
                Line((-12.5, -177.5), (-14.5, -177.5))
                ThreePointArc((-14.5, -177.5), (-17, -180), (-14.5, -182.5))
                Line((-14.5, -182.5), (-12.5, -182.5))
            make_face()
        extrude(amount=CORTAR_EXTRUIR33_DEPTH)


with BuildPart() as part_2:
    with SkipClean():  # the faces are left unmerged after this step: merging them gives an invalid solid
        add(part_1.part)

        # Cortar-Extruir33: cut by cortar_extruir33_tool
        add(cortar_extruir33_tool.part, mode=Mode.SUBTRACT)


with BuildPart() as body_2_2_1:
    with SkipClean():  # the faces are left unmerged after this step: merging them gives an invalid solid
        add(body_2_2.part)

        # Cortar-Extruir33: cut by cortar_extruir33_tool
        add(cortar_extruir33_tool.part, mode=Mode.SUBTRACT)

    # Croquis67 → Cortar-Extruir34 (cut)
    with BuildSketch(Plane.XY.offset(10.822320598).offset(CORTAR_EXTRUIR34_START)):
        with BuildLine():
            Line((-14.5, -177.5), (-20, -177.5))
            Line((-20, -177.5), (-20, -182.5))
            Line((-20, -182.5), (-14.5, -182.5))
            ThreePointArc((-14.5, -182.5), (-17, -180), (-14.5, -177.5))
        make_face()
    extrude(amount=CORTAR_EXTRUIR34_DEPTH, mode=Mode.SUBTRACT)


solid = part_2.part
